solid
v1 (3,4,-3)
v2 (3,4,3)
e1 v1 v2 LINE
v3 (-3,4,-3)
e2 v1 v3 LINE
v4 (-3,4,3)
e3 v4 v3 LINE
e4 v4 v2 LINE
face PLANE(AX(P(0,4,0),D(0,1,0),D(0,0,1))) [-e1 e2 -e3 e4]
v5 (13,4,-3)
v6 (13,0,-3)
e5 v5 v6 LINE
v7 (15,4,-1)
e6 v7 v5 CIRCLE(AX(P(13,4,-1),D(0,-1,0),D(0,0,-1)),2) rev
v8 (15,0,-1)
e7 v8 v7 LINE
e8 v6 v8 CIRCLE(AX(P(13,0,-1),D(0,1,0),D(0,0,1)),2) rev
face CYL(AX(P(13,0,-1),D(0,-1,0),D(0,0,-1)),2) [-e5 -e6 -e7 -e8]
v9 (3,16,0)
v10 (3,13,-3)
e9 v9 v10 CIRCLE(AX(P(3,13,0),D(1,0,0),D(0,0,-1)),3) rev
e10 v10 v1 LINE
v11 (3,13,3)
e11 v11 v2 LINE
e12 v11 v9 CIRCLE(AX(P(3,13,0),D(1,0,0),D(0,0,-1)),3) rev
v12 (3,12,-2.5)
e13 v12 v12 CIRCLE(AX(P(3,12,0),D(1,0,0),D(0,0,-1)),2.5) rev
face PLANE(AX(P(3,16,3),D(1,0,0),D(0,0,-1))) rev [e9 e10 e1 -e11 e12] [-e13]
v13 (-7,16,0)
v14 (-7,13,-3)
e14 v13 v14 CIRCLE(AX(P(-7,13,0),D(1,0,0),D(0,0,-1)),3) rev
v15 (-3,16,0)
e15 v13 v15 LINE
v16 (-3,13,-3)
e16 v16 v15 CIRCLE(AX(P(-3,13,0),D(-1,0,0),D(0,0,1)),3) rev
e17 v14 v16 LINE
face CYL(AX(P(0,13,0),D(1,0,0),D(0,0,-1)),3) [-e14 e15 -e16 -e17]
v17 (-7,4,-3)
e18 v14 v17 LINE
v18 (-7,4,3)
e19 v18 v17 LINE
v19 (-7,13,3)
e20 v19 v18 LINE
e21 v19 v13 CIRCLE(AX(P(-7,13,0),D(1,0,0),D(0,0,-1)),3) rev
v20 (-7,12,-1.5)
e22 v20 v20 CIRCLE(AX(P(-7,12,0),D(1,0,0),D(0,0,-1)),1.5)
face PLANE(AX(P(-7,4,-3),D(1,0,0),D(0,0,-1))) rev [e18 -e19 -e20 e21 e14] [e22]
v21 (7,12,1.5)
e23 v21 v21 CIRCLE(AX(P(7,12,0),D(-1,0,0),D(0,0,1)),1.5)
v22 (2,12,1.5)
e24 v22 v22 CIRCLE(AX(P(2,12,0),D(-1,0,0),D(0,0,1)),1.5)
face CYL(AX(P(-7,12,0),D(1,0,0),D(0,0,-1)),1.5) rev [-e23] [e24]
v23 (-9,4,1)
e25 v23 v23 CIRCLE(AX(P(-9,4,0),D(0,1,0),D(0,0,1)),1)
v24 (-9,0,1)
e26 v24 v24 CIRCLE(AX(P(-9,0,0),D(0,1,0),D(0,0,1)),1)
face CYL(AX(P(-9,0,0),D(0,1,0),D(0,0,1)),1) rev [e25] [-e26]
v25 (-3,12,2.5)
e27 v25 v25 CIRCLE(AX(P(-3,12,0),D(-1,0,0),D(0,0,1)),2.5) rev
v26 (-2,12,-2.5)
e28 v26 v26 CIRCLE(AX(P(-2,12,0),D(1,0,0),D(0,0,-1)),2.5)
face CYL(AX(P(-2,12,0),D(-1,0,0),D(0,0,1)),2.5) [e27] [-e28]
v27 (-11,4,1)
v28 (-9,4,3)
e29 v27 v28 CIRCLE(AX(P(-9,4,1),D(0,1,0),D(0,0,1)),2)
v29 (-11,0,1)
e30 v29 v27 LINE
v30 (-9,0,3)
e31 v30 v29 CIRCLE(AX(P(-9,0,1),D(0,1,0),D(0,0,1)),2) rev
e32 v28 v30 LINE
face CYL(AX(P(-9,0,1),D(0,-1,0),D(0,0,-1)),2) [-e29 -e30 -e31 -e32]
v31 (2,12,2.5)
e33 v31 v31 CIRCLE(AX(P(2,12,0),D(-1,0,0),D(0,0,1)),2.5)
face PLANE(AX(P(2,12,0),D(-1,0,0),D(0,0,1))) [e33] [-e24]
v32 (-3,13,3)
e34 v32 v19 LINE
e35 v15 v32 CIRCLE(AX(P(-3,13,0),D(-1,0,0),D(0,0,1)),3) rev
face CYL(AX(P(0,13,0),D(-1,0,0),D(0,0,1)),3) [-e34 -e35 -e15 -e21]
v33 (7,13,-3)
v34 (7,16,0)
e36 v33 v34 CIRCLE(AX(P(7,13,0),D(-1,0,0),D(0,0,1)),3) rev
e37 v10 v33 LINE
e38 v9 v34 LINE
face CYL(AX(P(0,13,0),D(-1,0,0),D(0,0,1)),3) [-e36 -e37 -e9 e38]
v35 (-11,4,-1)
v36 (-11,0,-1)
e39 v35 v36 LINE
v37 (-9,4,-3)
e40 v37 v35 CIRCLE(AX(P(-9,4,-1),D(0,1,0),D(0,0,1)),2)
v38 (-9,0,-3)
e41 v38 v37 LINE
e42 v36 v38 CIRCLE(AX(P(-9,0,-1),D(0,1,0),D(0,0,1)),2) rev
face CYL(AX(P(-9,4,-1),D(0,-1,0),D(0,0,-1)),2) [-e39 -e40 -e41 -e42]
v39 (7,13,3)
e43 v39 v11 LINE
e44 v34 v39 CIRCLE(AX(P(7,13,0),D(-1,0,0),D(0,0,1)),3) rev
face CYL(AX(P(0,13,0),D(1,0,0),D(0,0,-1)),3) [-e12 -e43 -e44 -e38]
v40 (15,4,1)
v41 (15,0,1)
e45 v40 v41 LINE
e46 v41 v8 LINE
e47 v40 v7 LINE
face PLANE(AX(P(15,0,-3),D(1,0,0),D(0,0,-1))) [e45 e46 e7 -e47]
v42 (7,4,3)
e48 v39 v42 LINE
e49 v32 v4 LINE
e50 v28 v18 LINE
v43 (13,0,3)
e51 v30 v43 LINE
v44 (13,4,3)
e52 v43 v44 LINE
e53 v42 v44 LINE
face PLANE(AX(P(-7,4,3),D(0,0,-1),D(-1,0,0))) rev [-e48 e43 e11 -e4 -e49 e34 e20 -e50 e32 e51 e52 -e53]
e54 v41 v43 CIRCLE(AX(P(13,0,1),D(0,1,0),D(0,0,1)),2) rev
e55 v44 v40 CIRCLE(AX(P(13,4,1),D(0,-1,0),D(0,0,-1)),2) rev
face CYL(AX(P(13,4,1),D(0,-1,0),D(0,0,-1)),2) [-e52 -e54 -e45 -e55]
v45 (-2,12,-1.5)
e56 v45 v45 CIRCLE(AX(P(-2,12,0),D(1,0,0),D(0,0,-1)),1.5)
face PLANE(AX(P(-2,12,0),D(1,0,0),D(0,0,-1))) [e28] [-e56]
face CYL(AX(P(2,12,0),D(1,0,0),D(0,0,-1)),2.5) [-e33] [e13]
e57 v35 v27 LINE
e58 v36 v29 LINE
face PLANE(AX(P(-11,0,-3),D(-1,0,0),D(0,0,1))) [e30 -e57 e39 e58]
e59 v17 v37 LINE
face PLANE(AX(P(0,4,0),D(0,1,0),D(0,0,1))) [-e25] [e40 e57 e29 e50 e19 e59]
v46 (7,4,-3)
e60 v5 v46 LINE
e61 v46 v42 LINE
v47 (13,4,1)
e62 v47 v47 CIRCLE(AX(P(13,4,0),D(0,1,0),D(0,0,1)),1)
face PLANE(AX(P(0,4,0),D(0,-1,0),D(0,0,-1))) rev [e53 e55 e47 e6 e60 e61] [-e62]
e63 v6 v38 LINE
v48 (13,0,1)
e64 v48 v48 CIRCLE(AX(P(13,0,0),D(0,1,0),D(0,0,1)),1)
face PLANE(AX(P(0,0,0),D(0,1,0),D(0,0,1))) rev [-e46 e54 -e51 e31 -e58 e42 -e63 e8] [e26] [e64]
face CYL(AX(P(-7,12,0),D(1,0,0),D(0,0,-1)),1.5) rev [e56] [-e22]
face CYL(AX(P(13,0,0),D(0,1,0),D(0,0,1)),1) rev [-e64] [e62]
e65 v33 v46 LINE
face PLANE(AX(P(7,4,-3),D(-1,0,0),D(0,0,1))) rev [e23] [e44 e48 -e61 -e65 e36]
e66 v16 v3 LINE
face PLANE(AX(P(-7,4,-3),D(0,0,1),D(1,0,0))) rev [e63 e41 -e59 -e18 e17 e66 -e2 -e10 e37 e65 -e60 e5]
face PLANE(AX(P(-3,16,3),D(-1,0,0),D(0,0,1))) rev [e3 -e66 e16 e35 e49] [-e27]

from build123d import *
from build123d.topology import SkipClean

# Parameters (mm, degrees)
SKETCH2_W               = 14
SKETCH2_H               = 6
BOSS_EXTRUDE1_DEPTH     = 4
SKETCH3_W               = 4
SKETCH3_H               = 6
BOSS_EXTRUDE2_DEPTH     = 12
CUT_EXTRUDE1_DEPTH      = 22.470910554
CUT_EXTRUDE1_DEPTH_BACK = 22.470910554
SKETCH4_R               = 1.5
BOSS_EXTRUDE3_START     = 1
SKETCH5_R               = 2.5
SKETCH5_R_2             = 1.5
BOSS_EXTRUDE3_DEPTH     = 1
SKETCH6_R               = 2.5
SKETCH6_R_2             = 1.5
BOSS_EXTRUDE4_DEPTH     = 1
SKETCH7_W               = 8
SKETCH7_H               = 6
SKETCH7_R               = 1
SKETCH7_W_2             = 4
BOSS_EXTRUDE5_DEPTH     = 4
FILLET1_R               = 2
FILLET2_R               = 3


with BuildPart() as part:
    # Sketch2 → Boss-Extrude1 (new body)
    with BuildSketch(Plane(origin=(0, 0, 0), x_dir=(1, 0, 0), z_dir=(0, 1, 0))):
        Rectangle(SKETCH2_W, SKETCH2_H)
    extrude(amount=BOSS_EXTRUDE1_DEPTH)

    # Sketch3 → Boss-Extrude2 (add)
    with BuildSketch(Plane(origin=(0, 4, 0), x_dir=(1, 0, 0), z_dir=(0, 1, 0))):
        with Locations((-5, 0)):
            Rectangle(SKETCH3_W, SKETCH3_H)
        with Locations((5, 0)):
            Rectangle(SKETCH3_W, SKETCH3_H)
    extrude(amount=BOSS_EXTRUDE2_DEPTH)

    # Sketch4 → Cut-Extrude1 (cut, two sides: drawn at the far end of the back side and taken through both)
    with BuildSketch(Plane(origin=(7, 0, 0), x_dir=(0, 0, -1), z_dir=(1, 0, 0)).offset(-CUT_EXTRUDE1_DEPTH_BACK)):
        with Locations((0, 12)):
            Circle(SKETCH4_R)
    extrude(amount=CUT_EXTRUDE1_DEPTH + CUT_EXTRUDE1_DEPTH_BACK, mode=Mode.SUBTRACT)

    # Sketch5 → Boss-Extrude3 (add)
    with BuildSketch(Plane(origin=(-3, 0, 0), x_dir=(0, 0, -1), z_dir=(1, 0, 0)).offset(BOSS_EXTRUDE3_START)):
        with Locations(Location((0, 12, 0), (0, 0, 180))):
            Circle(SKETCH5_R)
        with Locations((0, 12)):
            Circle(SKETCH5_R_2, mode=Mode.SUBTRACT)
    extrude(amount=-BOSS_EXTRUDE3_DEPTH)

    # Sketch6 → Boss-Extrude4 (add)
    with SkipClean():  # the faces are left unmerged after this step: merging them gives an invalid solid
        with BuildSketch(Plane.ZY.offset(-3)):
            with Locations((0, 12)):
                Circle(SKETCH6_R)
            with Locations((0, 12)):
                Circle(SKETCH6_R_2, mode=Mode.SUBTRACT)
        extrude(amount=BOSS_EXTRUDE4_DEPTH)

    # Sketch7 → Boss-Extrude5 (add)
    # profile 1 of 2: a face of its own
    with SkipClean():  # the faces are left unmerged after this step: merging them gives an invalid solid
        with BuildSketch(Plane(origin=(0, 4, 0), x_dir=(1, 0, 0), z_dir=(0, 1, 0))):
            with Locations((11, 0)):
                Rectangle(SKETCH7_W, SKETCH7_H)
            with Locations(Location((13, 0, 0), (0, 0, 270))):
                Circle(SKETCH7_R, mode=Mode.SUBTRACT)
        # profile 2 of 2: a face of its own
        with BuildSketch(Plane(origin=(0, 4, 0), x_dir=(1, 0, 0), z_dir=(0, 1, 0))):
            with Locations((-9, 0)):
                Rectangle(SKETCH7_W_2, SKETCH7_H)
            with Locations(Location((-9, 0, 0), (0, 0, 270))):
                Circle(SKETCH7_R, mode=Mode.SUBTRACT)
        extrude(amount=-BOSS_EXTRUDE5_DEPTH)

    # Fillet1
    fillet1_edges = [part.edges().sort_by_distance(p)[0] for p in [
        (15, 2, -3),
        (15, 2, 3),
        (-11, 2, 3),
        (-11, 2, -3),
    ]]
    fillet(fillet1_edges, radius=FILLET1_R)

    # Fillet2
    fillet2_edges = [part.edges().sort_by_distance(p)[0] for p in [
        (-5, 16, -3),
        (5, 16, -3),
        (5, 16, 3),
        (-5, 16, 3),
    ]]
    fillet(fillet2_edges, radius=FILLET2_R - 0.0001)  # a hair under: the kernel refuses the full size


solid = part.part
